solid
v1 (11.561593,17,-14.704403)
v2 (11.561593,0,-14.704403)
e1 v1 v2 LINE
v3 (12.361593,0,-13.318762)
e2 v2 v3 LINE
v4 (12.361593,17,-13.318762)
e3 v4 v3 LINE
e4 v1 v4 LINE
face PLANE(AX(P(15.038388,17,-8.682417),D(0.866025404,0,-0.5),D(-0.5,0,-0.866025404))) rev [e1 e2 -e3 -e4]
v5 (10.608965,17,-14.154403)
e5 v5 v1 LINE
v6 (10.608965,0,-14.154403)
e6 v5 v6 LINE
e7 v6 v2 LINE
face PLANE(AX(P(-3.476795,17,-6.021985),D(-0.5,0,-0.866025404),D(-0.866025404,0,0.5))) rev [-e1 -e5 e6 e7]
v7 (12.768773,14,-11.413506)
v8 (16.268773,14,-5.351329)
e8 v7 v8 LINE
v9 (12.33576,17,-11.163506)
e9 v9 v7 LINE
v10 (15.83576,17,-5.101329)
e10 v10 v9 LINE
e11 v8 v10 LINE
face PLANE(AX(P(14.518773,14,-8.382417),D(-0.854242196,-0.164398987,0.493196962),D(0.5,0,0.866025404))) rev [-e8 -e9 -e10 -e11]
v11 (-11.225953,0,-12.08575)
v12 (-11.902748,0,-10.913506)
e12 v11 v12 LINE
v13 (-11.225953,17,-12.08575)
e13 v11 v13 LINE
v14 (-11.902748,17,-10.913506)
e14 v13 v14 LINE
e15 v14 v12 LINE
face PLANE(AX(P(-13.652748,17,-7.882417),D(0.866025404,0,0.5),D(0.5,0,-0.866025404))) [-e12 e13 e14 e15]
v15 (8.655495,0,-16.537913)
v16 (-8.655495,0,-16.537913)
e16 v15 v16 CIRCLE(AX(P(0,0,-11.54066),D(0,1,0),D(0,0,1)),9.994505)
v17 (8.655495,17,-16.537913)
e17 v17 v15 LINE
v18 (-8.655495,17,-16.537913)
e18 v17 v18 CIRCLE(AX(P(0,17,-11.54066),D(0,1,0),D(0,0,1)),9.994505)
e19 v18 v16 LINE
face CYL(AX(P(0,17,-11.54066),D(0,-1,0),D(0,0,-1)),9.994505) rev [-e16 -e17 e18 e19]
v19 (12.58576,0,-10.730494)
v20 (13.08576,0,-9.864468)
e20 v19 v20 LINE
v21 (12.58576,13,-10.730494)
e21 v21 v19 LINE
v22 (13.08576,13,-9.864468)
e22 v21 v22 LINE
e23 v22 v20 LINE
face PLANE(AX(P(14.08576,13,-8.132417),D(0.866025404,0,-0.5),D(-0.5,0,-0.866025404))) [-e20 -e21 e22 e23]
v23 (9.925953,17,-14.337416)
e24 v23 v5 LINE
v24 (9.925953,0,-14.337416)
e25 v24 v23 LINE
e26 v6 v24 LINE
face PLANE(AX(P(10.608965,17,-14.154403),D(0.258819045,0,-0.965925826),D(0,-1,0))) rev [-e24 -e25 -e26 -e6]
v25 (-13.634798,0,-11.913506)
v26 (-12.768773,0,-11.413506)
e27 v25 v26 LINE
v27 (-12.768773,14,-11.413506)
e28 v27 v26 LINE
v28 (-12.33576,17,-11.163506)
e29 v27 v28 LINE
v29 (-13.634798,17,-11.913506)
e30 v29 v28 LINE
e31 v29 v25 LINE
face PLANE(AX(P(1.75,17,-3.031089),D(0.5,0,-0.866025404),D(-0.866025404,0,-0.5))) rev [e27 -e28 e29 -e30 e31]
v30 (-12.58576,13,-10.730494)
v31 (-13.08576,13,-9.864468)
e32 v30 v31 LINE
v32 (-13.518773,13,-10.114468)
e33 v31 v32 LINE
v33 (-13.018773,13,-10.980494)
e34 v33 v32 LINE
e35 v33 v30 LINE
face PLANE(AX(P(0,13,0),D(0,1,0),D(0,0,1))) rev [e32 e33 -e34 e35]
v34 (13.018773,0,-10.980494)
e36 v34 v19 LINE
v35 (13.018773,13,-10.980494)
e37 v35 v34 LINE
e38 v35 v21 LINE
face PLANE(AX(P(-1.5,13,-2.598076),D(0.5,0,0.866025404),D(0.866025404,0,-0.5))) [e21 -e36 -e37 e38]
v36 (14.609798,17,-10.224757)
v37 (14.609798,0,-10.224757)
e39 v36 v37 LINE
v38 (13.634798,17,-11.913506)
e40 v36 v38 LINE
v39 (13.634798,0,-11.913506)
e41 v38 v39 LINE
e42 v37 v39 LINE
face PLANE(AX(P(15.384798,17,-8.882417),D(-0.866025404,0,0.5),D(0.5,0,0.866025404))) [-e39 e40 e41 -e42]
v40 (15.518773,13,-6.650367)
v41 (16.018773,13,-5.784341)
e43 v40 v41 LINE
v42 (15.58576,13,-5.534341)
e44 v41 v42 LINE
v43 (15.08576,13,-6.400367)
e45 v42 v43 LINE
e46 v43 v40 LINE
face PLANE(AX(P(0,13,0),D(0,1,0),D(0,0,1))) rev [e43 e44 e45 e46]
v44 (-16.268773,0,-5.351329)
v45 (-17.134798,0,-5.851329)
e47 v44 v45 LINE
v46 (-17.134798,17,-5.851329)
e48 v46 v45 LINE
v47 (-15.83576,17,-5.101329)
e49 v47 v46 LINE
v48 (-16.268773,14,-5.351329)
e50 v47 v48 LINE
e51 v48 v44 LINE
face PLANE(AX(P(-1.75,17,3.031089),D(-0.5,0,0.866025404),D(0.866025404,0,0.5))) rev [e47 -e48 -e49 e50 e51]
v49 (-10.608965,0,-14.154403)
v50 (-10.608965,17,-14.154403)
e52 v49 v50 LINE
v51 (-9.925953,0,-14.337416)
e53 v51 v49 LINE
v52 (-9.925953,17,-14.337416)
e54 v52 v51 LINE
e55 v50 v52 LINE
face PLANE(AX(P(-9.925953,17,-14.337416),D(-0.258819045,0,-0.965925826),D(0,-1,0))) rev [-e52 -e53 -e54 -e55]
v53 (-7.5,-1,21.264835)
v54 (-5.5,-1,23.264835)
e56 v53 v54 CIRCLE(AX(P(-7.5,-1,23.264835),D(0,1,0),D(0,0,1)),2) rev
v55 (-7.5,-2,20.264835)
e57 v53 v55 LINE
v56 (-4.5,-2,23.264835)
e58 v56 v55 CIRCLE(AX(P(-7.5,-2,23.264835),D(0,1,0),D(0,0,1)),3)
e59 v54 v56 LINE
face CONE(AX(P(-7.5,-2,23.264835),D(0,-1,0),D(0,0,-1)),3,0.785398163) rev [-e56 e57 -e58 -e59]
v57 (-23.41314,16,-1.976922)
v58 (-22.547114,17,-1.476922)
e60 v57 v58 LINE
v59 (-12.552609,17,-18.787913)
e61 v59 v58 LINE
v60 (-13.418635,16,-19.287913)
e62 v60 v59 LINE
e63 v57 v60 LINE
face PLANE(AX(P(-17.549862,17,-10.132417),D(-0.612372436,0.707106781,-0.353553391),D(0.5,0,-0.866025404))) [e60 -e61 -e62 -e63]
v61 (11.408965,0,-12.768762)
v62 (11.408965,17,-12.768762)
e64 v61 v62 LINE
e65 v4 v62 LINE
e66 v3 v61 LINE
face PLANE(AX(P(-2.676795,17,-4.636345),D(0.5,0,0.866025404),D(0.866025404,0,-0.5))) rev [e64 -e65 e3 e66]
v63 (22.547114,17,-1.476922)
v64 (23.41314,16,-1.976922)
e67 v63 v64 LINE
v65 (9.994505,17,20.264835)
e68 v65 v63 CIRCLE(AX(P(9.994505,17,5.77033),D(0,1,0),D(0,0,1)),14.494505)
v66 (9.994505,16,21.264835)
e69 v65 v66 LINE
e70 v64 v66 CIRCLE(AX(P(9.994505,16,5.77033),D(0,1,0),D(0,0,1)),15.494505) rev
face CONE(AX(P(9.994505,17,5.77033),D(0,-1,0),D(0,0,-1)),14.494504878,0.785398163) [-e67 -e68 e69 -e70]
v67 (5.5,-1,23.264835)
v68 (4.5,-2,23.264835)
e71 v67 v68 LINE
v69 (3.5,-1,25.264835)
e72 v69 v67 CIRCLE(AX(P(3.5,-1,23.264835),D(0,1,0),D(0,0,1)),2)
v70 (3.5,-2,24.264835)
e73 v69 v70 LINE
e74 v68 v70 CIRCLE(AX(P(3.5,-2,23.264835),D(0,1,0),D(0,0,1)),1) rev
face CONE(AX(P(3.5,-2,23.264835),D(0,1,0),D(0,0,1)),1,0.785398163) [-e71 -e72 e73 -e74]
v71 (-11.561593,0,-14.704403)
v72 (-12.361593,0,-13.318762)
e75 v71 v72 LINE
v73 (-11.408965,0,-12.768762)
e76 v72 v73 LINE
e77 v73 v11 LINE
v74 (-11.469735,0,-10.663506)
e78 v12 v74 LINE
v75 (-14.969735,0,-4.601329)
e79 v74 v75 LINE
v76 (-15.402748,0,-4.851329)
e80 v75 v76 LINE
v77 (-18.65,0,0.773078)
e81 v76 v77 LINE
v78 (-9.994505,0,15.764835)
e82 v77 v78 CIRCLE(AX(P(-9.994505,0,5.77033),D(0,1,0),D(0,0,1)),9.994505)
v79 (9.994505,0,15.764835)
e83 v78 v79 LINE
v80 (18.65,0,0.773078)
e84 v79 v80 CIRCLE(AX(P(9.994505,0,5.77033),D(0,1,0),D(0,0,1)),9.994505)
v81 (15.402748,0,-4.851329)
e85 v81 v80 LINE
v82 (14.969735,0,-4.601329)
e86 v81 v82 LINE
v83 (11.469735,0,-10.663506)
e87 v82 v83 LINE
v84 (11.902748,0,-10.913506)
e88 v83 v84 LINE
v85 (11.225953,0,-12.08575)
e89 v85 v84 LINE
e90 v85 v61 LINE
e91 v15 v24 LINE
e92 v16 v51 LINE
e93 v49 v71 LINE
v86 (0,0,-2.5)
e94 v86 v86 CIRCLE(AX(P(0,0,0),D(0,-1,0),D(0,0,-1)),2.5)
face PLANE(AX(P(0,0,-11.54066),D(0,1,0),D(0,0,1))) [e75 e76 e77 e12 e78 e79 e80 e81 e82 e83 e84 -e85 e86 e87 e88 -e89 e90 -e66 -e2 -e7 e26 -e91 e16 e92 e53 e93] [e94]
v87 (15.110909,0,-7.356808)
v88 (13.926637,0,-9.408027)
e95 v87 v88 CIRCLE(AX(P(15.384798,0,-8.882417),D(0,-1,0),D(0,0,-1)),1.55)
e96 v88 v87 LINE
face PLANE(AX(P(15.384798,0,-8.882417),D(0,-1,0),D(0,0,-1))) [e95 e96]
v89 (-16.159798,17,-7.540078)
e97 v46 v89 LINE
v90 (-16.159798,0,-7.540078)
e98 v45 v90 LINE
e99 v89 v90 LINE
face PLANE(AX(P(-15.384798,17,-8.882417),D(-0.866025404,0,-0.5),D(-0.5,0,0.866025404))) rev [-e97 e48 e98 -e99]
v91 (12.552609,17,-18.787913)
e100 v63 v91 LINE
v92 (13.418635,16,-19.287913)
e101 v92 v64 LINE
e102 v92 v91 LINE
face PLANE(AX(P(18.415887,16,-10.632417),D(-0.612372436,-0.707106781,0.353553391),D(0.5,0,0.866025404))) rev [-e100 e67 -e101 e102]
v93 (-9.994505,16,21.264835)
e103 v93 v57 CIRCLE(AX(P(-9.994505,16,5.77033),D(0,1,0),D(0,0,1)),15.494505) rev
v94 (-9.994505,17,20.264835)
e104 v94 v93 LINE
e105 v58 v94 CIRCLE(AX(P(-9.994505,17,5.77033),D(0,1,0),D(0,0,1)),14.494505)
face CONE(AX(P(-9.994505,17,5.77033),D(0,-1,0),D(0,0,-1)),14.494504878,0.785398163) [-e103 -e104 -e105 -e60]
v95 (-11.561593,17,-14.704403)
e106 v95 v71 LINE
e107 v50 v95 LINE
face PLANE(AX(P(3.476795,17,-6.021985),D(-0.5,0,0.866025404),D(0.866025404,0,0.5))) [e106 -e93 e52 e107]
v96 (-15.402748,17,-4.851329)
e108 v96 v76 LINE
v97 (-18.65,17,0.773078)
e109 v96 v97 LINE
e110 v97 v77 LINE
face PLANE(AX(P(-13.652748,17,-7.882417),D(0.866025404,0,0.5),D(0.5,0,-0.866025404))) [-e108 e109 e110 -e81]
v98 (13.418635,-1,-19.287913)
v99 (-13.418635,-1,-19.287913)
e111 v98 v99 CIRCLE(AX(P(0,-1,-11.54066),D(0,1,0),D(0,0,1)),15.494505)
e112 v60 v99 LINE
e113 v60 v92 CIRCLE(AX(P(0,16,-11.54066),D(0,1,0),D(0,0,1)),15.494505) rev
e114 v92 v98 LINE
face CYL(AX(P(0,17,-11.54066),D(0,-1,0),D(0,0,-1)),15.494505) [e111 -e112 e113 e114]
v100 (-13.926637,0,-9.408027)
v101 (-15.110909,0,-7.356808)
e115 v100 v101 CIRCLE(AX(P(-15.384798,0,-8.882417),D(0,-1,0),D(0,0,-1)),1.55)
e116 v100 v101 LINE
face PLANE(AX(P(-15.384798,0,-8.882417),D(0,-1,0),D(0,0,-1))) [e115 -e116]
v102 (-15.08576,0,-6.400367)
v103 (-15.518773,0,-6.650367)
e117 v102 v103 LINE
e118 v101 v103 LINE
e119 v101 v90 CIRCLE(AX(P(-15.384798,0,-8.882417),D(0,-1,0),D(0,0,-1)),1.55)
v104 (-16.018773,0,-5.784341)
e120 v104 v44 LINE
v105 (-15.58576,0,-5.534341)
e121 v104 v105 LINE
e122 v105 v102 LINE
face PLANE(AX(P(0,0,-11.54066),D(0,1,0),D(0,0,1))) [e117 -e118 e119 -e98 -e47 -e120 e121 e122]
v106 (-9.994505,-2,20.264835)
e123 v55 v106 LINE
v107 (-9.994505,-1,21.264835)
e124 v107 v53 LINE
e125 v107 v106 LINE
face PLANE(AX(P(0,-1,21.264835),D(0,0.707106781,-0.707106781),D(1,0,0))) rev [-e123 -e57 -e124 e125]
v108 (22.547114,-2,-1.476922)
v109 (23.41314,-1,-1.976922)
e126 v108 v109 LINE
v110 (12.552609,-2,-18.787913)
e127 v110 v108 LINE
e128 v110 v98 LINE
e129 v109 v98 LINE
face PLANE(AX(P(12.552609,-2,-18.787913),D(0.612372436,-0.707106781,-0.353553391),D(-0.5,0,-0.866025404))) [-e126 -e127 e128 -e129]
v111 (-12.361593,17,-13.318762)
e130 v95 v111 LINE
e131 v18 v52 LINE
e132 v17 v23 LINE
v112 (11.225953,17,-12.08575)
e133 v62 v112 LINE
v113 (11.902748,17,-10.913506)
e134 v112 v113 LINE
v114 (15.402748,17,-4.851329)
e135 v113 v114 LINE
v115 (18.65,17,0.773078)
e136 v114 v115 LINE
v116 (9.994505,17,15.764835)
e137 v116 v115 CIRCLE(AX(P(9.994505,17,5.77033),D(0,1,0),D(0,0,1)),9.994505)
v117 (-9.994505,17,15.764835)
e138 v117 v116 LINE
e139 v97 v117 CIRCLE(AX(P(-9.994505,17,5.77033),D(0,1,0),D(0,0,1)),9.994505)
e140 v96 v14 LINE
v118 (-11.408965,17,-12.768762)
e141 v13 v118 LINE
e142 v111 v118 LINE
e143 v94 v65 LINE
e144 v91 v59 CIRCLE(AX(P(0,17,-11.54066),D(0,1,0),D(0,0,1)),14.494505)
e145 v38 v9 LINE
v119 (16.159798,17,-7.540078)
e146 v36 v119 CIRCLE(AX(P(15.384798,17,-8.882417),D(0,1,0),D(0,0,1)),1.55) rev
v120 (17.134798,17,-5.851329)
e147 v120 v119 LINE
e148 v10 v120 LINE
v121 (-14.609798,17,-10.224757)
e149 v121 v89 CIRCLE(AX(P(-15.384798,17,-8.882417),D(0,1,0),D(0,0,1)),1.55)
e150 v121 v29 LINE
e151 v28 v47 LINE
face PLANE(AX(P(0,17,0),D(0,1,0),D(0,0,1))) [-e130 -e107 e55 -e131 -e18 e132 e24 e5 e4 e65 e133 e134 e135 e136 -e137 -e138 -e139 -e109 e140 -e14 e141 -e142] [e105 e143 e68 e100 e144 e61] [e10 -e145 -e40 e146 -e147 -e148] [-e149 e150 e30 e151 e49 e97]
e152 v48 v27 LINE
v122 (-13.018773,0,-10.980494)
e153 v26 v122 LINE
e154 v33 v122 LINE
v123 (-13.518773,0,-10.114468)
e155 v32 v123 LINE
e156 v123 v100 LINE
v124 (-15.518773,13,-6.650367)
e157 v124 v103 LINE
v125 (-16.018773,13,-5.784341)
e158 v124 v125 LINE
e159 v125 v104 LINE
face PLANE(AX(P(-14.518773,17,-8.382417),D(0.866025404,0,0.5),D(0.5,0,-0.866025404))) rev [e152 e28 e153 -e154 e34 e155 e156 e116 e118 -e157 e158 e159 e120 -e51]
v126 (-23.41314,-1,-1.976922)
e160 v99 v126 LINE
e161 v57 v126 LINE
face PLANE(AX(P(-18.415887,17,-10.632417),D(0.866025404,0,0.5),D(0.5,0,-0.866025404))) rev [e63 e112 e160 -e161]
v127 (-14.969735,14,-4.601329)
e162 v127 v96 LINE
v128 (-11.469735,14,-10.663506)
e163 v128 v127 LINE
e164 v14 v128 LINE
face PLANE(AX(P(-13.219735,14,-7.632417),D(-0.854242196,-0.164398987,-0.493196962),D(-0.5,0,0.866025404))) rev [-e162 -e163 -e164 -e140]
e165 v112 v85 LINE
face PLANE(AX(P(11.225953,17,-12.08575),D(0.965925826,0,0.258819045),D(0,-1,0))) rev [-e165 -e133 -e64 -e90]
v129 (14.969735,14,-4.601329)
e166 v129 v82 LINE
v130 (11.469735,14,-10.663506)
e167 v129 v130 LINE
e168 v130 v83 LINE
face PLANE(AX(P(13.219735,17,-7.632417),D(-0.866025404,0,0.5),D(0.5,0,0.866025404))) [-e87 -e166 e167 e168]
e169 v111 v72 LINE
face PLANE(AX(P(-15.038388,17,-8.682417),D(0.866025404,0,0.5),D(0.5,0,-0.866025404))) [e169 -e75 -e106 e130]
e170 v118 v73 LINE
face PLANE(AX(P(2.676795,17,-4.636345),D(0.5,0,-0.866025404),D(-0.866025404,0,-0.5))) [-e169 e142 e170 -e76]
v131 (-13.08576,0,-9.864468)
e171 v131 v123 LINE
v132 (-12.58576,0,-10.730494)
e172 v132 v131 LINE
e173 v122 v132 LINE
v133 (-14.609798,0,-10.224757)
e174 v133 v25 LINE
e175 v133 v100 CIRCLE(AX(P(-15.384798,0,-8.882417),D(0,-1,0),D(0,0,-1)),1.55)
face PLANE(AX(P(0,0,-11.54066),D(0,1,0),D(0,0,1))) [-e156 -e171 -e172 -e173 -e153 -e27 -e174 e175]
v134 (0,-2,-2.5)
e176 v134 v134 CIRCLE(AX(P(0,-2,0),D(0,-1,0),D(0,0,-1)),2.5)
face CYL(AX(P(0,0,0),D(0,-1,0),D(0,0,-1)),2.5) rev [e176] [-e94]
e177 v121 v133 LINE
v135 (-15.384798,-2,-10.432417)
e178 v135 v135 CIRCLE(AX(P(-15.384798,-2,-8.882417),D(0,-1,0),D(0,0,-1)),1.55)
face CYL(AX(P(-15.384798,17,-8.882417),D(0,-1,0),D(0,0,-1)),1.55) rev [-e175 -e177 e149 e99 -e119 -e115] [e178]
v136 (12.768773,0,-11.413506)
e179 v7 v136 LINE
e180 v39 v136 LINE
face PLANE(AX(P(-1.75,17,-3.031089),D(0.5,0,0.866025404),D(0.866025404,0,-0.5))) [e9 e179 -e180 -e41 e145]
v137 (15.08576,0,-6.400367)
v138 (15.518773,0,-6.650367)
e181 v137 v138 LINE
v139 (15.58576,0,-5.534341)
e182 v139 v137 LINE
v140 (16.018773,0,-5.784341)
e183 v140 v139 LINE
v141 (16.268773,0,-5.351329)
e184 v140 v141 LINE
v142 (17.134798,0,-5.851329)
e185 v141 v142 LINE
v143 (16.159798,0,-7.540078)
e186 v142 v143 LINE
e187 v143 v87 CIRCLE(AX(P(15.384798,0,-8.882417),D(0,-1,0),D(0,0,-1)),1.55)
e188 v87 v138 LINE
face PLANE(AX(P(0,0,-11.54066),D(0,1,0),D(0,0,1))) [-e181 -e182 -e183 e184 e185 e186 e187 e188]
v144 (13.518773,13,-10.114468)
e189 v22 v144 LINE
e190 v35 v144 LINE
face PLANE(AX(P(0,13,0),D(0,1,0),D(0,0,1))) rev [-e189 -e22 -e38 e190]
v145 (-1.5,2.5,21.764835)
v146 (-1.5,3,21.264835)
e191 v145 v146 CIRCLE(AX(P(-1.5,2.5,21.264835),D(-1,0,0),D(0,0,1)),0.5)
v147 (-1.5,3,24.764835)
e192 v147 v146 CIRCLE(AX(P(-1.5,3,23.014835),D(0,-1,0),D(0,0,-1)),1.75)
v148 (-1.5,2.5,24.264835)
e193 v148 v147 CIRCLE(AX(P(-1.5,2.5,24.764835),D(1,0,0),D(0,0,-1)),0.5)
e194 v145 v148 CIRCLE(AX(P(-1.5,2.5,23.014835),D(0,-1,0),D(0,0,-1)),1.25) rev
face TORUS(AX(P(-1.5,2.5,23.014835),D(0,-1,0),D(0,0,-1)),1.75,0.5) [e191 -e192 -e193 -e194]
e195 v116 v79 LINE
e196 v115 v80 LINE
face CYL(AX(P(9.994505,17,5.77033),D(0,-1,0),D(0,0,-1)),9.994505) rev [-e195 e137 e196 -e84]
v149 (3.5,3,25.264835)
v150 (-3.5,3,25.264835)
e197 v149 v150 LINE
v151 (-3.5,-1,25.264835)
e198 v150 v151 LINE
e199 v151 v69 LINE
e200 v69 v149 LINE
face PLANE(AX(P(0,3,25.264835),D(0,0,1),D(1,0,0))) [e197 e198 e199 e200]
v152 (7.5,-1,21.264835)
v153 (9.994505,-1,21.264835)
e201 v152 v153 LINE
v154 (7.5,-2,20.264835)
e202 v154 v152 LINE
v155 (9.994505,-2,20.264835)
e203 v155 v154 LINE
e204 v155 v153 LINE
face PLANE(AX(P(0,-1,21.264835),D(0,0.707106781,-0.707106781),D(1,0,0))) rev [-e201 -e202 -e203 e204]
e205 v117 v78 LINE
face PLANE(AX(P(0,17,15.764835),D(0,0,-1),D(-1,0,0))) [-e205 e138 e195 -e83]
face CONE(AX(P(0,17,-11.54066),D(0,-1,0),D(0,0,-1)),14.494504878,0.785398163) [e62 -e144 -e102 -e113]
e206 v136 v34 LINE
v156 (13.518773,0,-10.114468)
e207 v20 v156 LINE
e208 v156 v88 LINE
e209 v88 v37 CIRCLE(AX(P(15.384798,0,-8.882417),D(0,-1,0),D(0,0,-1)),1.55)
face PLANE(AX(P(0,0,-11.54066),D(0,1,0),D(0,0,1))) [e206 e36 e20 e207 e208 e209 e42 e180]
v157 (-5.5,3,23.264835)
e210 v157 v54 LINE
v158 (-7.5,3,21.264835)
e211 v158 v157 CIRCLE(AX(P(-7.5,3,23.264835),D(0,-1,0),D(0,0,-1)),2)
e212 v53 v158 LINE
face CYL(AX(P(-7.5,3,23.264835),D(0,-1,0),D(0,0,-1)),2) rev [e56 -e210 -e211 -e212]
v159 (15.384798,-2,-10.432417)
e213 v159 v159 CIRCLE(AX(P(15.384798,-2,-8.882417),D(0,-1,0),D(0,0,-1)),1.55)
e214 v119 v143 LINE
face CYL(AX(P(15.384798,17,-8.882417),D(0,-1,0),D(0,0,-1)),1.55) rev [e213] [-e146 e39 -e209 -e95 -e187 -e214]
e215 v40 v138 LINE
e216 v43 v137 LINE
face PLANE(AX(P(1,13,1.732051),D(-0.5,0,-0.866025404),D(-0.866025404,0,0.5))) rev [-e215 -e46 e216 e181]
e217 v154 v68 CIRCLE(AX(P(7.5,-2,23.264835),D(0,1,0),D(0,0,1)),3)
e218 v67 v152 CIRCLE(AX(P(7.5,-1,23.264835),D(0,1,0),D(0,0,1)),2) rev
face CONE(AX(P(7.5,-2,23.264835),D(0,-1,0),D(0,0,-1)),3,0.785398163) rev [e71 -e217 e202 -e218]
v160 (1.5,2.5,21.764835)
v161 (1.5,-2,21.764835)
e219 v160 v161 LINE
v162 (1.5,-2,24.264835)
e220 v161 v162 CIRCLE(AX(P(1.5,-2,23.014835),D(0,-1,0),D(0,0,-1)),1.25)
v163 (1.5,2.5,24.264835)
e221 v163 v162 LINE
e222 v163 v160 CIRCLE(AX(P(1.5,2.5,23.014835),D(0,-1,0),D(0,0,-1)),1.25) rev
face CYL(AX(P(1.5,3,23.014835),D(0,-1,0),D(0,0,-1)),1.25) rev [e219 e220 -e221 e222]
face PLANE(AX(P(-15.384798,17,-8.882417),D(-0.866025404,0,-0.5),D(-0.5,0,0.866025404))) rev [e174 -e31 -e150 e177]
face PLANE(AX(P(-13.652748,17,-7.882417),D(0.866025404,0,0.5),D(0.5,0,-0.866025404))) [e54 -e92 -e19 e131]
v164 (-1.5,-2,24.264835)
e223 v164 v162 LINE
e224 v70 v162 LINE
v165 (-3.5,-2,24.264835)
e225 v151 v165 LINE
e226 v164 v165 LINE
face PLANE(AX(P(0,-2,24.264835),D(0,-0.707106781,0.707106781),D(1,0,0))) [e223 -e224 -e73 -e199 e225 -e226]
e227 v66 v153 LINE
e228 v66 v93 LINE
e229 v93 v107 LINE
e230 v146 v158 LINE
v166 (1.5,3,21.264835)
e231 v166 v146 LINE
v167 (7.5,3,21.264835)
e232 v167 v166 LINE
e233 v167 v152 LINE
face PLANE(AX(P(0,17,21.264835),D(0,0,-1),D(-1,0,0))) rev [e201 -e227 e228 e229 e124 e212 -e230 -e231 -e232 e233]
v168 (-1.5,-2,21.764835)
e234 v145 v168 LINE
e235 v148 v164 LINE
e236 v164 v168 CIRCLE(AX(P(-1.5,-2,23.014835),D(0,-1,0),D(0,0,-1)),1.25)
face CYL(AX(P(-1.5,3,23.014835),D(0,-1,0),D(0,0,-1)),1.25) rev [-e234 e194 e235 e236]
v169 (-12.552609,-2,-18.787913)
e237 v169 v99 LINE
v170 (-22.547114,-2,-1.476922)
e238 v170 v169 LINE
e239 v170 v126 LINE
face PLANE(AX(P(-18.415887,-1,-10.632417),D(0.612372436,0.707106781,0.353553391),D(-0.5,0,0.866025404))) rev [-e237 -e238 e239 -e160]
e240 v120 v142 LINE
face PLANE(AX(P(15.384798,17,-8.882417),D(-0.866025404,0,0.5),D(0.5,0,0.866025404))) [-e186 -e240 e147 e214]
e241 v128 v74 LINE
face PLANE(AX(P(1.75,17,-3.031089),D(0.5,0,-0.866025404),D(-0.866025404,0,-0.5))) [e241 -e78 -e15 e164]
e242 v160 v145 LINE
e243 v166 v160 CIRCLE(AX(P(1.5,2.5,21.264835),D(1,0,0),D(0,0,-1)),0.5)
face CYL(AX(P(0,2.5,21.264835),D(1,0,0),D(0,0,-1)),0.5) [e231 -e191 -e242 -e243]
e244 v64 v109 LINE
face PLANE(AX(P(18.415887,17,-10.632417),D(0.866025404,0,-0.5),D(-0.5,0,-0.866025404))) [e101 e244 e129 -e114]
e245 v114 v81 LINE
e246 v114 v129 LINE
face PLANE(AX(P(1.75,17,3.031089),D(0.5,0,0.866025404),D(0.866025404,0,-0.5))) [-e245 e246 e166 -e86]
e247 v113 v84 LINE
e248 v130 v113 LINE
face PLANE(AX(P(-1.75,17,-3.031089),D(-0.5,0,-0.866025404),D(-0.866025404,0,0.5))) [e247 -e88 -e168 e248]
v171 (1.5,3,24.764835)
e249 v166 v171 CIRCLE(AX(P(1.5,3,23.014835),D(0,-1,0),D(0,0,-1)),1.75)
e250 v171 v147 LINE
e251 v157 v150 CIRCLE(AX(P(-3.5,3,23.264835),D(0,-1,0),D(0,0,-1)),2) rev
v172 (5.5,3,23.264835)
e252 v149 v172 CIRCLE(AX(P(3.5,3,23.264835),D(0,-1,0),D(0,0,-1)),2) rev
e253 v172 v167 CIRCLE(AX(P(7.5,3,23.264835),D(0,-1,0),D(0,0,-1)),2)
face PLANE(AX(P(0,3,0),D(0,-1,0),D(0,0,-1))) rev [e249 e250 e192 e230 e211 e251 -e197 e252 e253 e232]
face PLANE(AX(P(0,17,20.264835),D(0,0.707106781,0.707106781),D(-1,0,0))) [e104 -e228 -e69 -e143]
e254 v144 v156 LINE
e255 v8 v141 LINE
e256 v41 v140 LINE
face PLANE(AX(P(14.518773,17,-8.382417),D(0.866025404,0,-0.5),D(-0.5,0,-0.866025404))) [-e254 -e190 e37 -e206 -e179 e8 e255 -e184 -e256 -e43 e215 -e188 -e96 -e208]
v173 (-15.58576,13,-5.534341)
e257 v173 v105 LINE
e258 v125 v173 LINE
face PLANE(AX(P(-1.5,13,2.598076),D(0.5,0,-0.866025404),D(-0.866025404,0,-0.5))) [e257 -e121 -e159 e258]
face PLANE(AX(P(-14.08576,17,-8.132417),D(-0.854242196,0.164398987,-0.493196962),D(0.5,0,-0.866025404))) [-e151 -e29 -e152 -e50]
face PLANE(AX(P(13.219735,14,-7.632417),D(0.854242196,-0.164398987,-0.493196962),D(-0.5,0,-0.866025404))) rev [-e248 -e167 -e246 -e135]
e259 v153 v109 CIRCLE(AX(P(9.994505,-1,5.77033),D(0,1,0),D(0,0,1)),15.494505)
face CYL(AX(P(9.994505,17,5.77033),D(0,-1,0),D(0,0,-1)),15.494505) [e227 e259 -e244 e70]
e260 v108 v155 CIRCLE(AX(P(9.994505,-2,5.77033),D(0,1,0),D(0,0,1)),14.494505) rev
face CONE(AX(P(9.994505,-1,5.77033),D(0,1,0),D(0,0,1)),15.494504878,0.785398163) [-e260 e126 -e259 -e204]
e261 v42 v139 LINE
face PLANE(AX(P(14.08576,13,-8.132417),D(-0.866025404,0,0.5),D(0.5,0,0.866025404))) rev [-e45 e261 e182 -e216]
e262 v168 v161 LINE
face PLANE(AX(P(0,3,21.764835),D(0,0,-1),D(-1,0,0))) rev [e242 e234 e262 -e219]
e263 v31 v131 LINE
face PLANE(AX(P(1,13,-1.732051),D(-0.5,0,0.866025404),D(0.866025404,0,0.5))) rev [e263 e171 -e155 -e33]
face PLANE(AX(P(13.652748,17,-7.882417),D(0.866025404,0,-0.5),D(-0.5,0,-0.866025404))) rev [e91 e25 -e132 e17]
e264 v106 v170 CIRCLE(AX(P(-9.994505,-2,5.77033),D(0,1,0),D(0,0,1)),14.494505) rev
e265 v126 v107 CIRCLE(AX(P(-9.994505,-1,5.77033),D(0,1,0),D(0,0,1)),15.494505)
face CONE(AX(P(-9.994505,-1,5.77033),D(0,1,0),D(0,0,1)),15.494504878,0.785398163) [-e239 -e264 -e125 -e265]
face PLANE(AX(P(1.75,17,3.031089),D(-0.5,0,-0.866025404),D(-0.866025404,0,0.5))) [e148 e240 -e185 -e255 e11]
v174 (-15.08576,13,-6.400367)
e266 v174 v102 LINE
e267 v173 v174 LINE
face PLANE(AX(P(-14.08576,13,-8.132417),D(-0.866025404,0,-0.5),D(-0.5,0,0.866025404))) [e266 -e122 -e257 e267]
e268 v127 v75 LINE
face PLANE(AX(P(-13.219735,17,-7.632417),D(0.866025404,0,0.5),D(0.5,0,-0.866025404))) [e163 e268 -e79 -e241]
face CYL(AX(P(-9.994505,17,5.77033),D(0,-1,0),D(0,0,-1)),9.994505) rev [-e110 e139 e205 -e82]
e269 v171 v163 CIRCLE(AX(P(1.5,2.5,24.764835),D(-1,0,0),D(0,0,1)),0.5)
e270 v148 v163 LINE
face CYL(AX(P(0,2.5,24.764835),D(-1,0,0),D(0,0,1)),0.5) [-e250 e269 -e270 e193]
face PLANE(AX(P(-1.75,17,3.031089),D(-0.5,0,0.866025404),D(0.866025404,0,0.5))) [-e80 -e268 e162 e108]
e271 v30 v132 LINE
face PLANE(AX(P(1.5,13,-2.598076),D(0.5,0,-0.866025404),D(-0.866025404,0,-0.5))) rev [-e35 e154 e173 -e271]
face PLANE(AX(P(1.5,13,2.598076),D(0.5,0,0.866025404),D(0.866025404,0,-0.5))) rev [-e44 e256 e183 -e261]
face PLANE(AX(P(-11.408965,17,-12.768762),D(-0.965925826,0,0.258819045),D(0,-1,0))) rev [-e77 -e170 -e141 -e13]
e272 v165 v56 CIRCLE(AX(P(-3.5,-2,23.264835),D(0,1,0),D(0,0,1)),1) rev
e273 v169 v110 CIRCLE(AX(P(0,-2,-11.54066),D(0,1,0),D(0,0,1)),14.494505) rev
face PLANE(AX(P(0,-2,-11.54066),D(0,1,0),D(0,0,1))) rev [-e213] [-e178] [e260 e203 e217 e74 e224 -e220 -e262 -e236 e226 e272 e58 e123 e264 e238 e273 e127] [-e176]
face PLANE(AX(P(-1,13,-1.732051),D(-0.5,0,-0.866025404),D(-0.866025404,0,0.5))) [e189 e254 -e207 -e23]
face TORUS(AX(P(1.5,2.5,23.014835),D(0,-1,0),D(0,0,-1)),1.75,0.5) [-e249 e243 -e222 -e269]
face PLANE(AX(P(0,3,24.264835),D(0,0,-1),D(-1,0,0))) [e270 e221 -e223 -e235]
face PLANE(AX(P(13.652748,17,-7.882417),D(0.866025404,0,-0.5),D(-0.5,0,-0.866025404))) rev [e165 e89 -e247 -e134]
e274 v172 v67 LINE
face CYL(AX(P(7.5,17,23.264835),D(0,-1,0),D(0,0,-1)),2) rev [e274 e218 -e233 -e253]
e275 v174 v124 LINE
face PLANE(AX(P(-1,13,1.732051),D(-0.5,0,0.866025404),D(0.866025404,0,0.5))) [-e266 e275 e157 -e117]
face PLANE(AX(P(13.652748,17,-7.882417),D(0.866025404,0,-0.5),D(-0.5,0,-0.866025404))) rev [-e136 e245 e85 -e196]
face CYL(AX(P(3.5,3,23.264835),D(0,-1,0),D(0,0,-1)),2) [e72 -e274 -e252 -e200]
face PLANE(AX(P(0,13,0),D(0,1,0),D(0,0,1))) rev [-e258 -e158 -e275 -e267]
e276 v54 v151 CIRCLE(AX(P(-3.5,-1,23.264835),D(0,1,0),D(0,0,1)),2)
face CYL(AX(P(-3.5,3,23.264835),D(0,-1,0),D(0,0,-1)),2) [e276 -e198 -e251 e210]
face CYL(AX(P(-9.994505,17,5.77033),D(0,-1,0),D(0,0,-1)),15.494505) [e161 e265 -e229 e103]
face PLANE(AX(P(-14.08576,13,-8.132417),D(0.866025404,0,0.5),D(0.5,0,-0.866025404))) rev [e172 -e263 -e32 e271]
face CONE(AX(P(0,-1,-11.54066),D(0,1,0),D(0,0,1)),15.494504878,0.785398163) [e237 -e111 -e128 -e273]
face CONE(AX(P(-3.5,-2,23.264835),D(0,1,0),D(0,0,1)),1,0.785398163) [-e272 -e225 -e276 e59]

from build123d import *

# Parameters (mm, degrees)
BOSS_EXTRUDE1_DEPTH = 17
CHAMFER1_SIZE       = 0.5
CUT_EXTRUDE1_DEPTH  = 13
BOSS_EXTRUDE2_START = -2
BOSS_EXTRUDE2_DEPTH = 2
SKETCH2_R           = 1.5499999999999992
SKETCH2_R_2         = 1.550000000000003
SKETCH2_R_3         = 2.5
CUT_EXTRUDE2_DEPTH  = 2
BOSS_EXTRUDE3_DEPTH = 5
FILLET1_R           = 2
FILLET2_R           = 0.5
CHAMFER3_SIZE       = 0.5
CHAMFER3_SIZE2      = 3
CHAMFER4_SIZE       = 1


with BuildPart() as part:
    # Sketch1 → Boss-Extrude1 (new body)
    with BuildSketch(Plane(origin=(0, 0, 0), x_dir=(1, 0, 0), z_dir=(0, 1, 0))):
        with BuildLine():
            ThreePointArc((13.418634843133532, 19.2879126019326), (5.33e-15, 27.035165040773038), (-13.418634843133521, 19.287912601932604))
            Line((-13.418634843133521, 19.2879126019326), (-23.413139720814414, 1.9769223572943453))
            ThreePointArc((-23.413139720814414, 1.976922357294347), (-23.413139720814407, -13.517582520386524), (-9.994504877680875, -21.264834959226956))
            Line((-9.994504877680875, -21.264834959226956), (9.994504877680878, -21.26483495922696))
            ThreePointArc((9.994504877680878, -21.26483495922696), (23.413139720814414, -13.517582520386526), (23.41313972081442, 1.9769223572943506))
            Line((23.41313972081442, 1.9769223572943488), (13.418634843133532, 19.2879126019326))
        make_face()
        with BuildLine():
            Line((-11.469734859267339, 10.663506392859015), (-11.902747561159552, 10.91350639285901))
            Line((-11.902747561159554, 10.91350639285901), (-10.975952641916443, 12.518762281184774))
            Line((-10.975952641916448, 12.518762281184776), (-12.361593287971548, 13.318762281184778))
            Line((-12.361593287971548, 13.318762281184778), (-11.561593287971546, 14.70440292723988))
            Line((-11.561593287971546, 14.70440292723988), (-10.17595264191644, 13.904402927239877))
            Line((-10.175952641916442, 13.904402927239877), (-8.655495122319113, 16.537912601932604))
            ThreePointArc((-8.655495122319113, 16.537912601932604), (1.33e-15, 21.535165040773038), (8.655495122319117, 16.537912601932604))
            Line((8.655495122319117, 16.537912601932604), (10.175952641916444, 13.904402927239877))
            Line((10.175952641916444, 13.904402927239877), (11.561593287971549, 14.70440292723988))
            Line((11.561593287971549, 14.70440292723988), (12.361593287971552, 13.318762281184778))
            Line((12.361593287971552, 13.318762281184778), (10.975952641916452, 12.518762281184776))
            Line((10.975952641916447, 12.518762281184772), (11.902747561159558, 10.91350639285901))
            Line((11.902747561159556, 10.913506392859007), (11.46973485926734, 10.663506392859015))
            Line((11.46973485926734, 10.663506392859015), (14.969734859267339, 4.601328566367944))
            Line((14.969734859267339, 4.601328566367944), (15.402747561159552, 4.851328566367944))
            Line((15.402747561159552, 4.8513285663679415), (18.64999999999999, -0.7730776427056512))
            ThreePointArc((18.64999999999999, -0.7730776427056494), (18.65, -10.767582520386522), (9.994504877680878, -15.764834959226958))
            Line((9.994504877680878, -15.76483495922696), (-9.994504877680871, -15.76483495922696))
            ThreePointArc((-9.994504877680868, -15.76483495922696), (-18.64999999999999, -10.767582520386524), (-18.64999999999999, -0.7730776427056494))
            Line((-18.64999999999999, -0.7730776427056512), (-15.402747561159547, 4.851328566367947))
            Line((-15.40274756115955, 4.851328566367947), (-14.969734859267337, 4.601328566367946))
            Line((-14.969734859267337, 4.601328566367946), (-11.469734859267339, 10.663506392859015))
        make_face(mode=Mode.SUBTRACT)
        with BuildLine():
            Line((13.63479836872844, 11.913506392859018), (14.609798368728441, 10.224756855479358))
            ThreePointArc((14.609798368728436, 10.224756855479354), (16.727137744594316, 9.657417479613473), (16.159798368728428, 7.540078103747593))
            Line((16.15979836872844, 7.5400781037476), (17.13479836872844, 5.851328566367942))
            Line((17.13479836872844, 5.851328566367942), (16.268772964944, 5.351328566367942))
            Line((16.268772964944, 5.351328566367942), (12.768772964944, 11.413506392859018))
            Line((12.768772964944, 11.413506392859018), (13.63479836872844, 11.913506392859018))
        make_face(mode=Mode.SUBTRACT)
        with BuildLine():
            Line((-13.634798368728436, 11.913506392859018), (-12.768772964943997, 11.413506392859018))
            Line((-12.768772964943997, 11.413506392859018), (-16.268772964944, 5.351328566367942))
            Line((-16.268772964944, 5.351328566367942), (-17.13479836872844, 5.851328566367942))
            Line((-17.13479836872844, 5.851328566367942), (-16.159798368728442, 7.540078103747597))
            ThreePointArc((-16.159798368728435, 7.540078103747593), (-16.727137744594312, 9.65741747961347), (-14.60979836872844, 10.224756855479354))
            Line((-14.609798368728441, 10.224756855479356), (-13.634798368728436, 11.913506392859018))
        make_face(mode=Mode.SUBTRACT)
    extrude(amount=BOSS_EXTRUDE1_DEPTH)

    # Chamfer1
    chamfer1_edges = [part.edges().sort_by_distance(p)[0] for p in [
        (-10.175952641916442, 8.5, -13.904402927239877),
        (-10.975952641916447, 8.5, -12.518762281184774),
        (10.97595264191645, 8.5, -12.518762281184774),
        (10.175952641916444, 8.5, -13.904402927239877),
    ]]
    chamfer(chamfer1_edges, length=CHAMFER1_SIZE)

    # Sketch1<3> → Cut-Extrude1 (cut)
    with BuildSketch(Plane(origin=(0, 0, 0), x_dir=(1, 0, 0), z_dir=(0, 1, 0))):
        Polygon((-12.585760263051778, 10.7304936909668), (-13.018772964943997, 10.9804936909668), (-13.518772964943999, 10.114468287182358), (-13.085760263051776, 9.86446828718236), align=None)
        Polygon((-15.08576026305178, 6.400366672044599), (-15.518772964944, 6.650366672044602), (-16.018772964944, 5.784341268260162), (-15.585760263051782, 5.53434126826016), align=None)
        Polygon((13.518772964944, 10.114468287182358), (13.018772964944, 10.9804936909668), (12.585760263051782, 10.7304936909668), (13.08576026305178, 9.86446828718236), align=None)
        Polygon((16.018772964944, 5.784341268260162), (15.518772964944, 6.6503666720445995), (15.085760263051784, 6.400366672044599), (15.585760263051785, 5.53434126826016), align=None)
    extrude(amount=CUT_EXTRUDE1_DEPTH, mode=Mode.SUBTRACT)

    # Sketch1<4> → Boss-Extrude2 (add)
    with BuildSketch(Plane(origin=(0, 0, 0), x_dir=(1, 0, 0), z_dir=(0, 1, 0)).offset(BOSS_EXTRUDE2_START)):
        with BuildLine():
            Line((-13.418634843133521, 19.2879126019326), (-23.413139720814414, 1.976922357294346))
            ThreePointArc((-23.413139720814414, 1.976922357294346), (-23.413139720814407, -13.517582520386522), (-9.994504877680875, -21.264834959226956))
            Line((-9.994504877680875, -21.264834959226956), (9.994504877680878, -21.26483495922696))
            ThreePointArc((9.994504877680878, -21.26483495922696), (23.413139720814414, -13.517582520386522), (23.41313972081442, 1.9769223572943484))
            Line((23.41313972081442, 1.9769223572943484), (13.418634843133532, 19.2879126019326))
            ThreePointArc((13.418634843133532, 19.2879126019326), (3.63e-15, 27.035165040773038), (-13.418634843133521, 19.2879126019326))
        make_face()
    extrude(amount=BOSS_EXTRUDE2_DEPTH)

    # Sketch2 → Cut-Extrude2 (cut)
    # profile 1 of 4: a face of its own
    with BuildSketch(Plane.XZ.offset(2)):
        with Locations(Location((-15.384798368728436, -8.882417479613482, 0), (0, 0, 270))):
            Circle(SKETCH2_R)
    # profile 2 of 4: a face of its own
    with BuildSketch(Plane.XZ.offset(2)):
        with Locations(Location((15.38479836872844, -8.882417479613482, 0), (0, 0, 270))):
            Circle(SKETCH2_R_2)
    # profile 3 of 4: a face of its own
    with BuildSketch(Plane.XZ.offset(2)):
        with Locations(Location((0, 0, 0), (0, 0, 270))):
            Circle(SKETCH2_R_3)
    # profile 4 of 4: a face of its own
    with BuildSketch(Plane.XZ.offset(2)):
        Polygon((5.499999999999999, 21.264834959226956), (5.5, 25.264834959226956), (-5.5, 25.264834959226956), (-5.499999999999999, 21.264834959226956), align=None)
        with BuildLine():
            Line((-1.4999999999999987, 24.264834959226945), (1.4999999999999987, 24.264834959226945))
            ThreePointArc((1.4999999999999987, 24.264834959226945), (2.7499999999999916, 23.014834959226953), (1.4999999999999987, 21.76483495922696))
            Line((1.4999999999999987, 21.76483495922696), (-1.4999999999999987, 21.76483495922696))
            ThreePointArc((-1.4999999999999987, 21.76483495922696), (-2.7499999999999916, 23.014834959226953), (-1.4999999999999987, 24.264834959226945))
        make_face(mode=Mode.SUBTRACT)
    extrude(amount=-CUT_EXTRUDE2_DEPTH, mode=Mode.SUBTRACT)

    # Sketch2<2> → Boss-Extrude3 (add)
    with BuildSketch(Plane.XZ.offset(2)):
        Polygon((-5.499999999999999, 21.264834959226956), (5.499999999999999, 21.264834959226956), (5.5, 25.264834959226956), (-5.5, 25.264834959226956), align=None)
        with BuildLine():
            ThreePointArc((-1.499999999999999, 21.76483495922696), (-2.7499999999999916, 23.014834959226953), (-1.4999999999999987, 24.264834959226945))
            Line((-1.4999999999999987, 24.264834959226945), (1.4999999999999987, 24.264834959226945))
            ThreePointArc((1.499999999999999, 24.264834959226945), (2.7499999999999916, 23.014834959226953), (1.4999999999999987, 21.76483495922696))
            Line((1.4999999999999987, 21.76483495922696), (-1.4999999999999987, 21.76483495922696))
        make_face(mode=Mode.SUBTRACT)
    extrude(amount=-BOSS_EXTRUDE3_DEPTH)

    # Fillet1
    fillet1_edges = [part.edges().sort_by_distance(p)[0] for p in [
        (5.499999999999999, 0.5, 21.264834959226956),
        (-5.499999999999999, 0.5, 21.264834959226956),
    ]]
    fillet(fillet1_edges, radius=FILLET1_R)
    fillet1_2_edges = [part.edges().sort_by_distance(p)[0] for p in [
        (5.5, 0.5, 25.264834959226956),
        (-5.5, 0.5, 25.264834959226956),
    ]]
    fillet(fillet1_2_edges, radius=FILLET1_R - 0.0001)  # a hair under: the kernel refuses the full size

    # Fillet2
    fillet2_edges = [part.edges().sort_by_distance(p)[0] for p in [
        (0, 3, 24.264834959226945),
        (2.7499999999999916, 3, 23.014834959226953),
        (-2.7499999999999916, 3, 23.014834959226953),
        (0, 3, 21.76483495922696),
    ]]
    fillet(fillet2_edges, radius=FILLET2_R - 0.0001)  # a hair under: the kernel refuses the full size

    # Chamfer3
    chamfer3_edges = [part.edges().sort_by_distance(p)[0] for p in [
        (13.21973485926734, 17, -7.63241747961348),
        (-13.219734859267337, 17, -7.63241747961348),
        (14.518772964943999, 17, -8.38241747961348),
        (-14.518772964943999, 17, -8.38241747961348),
    ]]
    chamfer3_side = [part.faces().sort_by_distance(p)[0] for p in [
        (-12.172522474712478, 17, -11.850756469441762),
    ]]
    chamfer(chamfer3_edges, length=CHAMFER3_SIZE, length2=CHAMFER3_SIZE2, reference=chamfer3_side[0])

    # Chamfer4
    chamfer4_edges = [part.edges().sort_by_distance(p)[0] for p in [
        (1.78e-15, 17, 21.26483495922696),
        (23.413139720814414, 17, 13.517582520386522),
        (18.415887281973976, 17, -10.632417479613474),
        (4.44e-15, 17, -27.035165040773038),
        (-18.415887281973966, 17, -10.632417479613473),
        (-23.413139720814407, 17, 13.517582520386526),
        (5.33e-15, -2, -27.035165040773038),
        (23.413139720814414, -2, 13.517582520386526),
        (-8.747252438840437, -2, 21.264834959226956),
        (-23.413139720814407, -2, 13.517582520386524),
        (-18.415887281973966, -2, -10.632417479613473),
        (18.415887281973976, -2, -10.632417479613474),
        (8.747252438840441, -2, 21.26483495922696),
        (0, -2, 25.264834959226956),
        (-4.9142428516949765, -2, 24.67907781092193),
        (4.914242851694976, -2, 24.67907781092193),
        (6.085786437626905, -2, 21.850621396853864),
        (-6.085786437626905, -2, 21.85062139685386),
    ]]
    chamfer(chamfer4_edges, length=CHAMFER4_SIZE - 0.0001)  # a hair under: the kernel refuses the full size


solid = part.part
